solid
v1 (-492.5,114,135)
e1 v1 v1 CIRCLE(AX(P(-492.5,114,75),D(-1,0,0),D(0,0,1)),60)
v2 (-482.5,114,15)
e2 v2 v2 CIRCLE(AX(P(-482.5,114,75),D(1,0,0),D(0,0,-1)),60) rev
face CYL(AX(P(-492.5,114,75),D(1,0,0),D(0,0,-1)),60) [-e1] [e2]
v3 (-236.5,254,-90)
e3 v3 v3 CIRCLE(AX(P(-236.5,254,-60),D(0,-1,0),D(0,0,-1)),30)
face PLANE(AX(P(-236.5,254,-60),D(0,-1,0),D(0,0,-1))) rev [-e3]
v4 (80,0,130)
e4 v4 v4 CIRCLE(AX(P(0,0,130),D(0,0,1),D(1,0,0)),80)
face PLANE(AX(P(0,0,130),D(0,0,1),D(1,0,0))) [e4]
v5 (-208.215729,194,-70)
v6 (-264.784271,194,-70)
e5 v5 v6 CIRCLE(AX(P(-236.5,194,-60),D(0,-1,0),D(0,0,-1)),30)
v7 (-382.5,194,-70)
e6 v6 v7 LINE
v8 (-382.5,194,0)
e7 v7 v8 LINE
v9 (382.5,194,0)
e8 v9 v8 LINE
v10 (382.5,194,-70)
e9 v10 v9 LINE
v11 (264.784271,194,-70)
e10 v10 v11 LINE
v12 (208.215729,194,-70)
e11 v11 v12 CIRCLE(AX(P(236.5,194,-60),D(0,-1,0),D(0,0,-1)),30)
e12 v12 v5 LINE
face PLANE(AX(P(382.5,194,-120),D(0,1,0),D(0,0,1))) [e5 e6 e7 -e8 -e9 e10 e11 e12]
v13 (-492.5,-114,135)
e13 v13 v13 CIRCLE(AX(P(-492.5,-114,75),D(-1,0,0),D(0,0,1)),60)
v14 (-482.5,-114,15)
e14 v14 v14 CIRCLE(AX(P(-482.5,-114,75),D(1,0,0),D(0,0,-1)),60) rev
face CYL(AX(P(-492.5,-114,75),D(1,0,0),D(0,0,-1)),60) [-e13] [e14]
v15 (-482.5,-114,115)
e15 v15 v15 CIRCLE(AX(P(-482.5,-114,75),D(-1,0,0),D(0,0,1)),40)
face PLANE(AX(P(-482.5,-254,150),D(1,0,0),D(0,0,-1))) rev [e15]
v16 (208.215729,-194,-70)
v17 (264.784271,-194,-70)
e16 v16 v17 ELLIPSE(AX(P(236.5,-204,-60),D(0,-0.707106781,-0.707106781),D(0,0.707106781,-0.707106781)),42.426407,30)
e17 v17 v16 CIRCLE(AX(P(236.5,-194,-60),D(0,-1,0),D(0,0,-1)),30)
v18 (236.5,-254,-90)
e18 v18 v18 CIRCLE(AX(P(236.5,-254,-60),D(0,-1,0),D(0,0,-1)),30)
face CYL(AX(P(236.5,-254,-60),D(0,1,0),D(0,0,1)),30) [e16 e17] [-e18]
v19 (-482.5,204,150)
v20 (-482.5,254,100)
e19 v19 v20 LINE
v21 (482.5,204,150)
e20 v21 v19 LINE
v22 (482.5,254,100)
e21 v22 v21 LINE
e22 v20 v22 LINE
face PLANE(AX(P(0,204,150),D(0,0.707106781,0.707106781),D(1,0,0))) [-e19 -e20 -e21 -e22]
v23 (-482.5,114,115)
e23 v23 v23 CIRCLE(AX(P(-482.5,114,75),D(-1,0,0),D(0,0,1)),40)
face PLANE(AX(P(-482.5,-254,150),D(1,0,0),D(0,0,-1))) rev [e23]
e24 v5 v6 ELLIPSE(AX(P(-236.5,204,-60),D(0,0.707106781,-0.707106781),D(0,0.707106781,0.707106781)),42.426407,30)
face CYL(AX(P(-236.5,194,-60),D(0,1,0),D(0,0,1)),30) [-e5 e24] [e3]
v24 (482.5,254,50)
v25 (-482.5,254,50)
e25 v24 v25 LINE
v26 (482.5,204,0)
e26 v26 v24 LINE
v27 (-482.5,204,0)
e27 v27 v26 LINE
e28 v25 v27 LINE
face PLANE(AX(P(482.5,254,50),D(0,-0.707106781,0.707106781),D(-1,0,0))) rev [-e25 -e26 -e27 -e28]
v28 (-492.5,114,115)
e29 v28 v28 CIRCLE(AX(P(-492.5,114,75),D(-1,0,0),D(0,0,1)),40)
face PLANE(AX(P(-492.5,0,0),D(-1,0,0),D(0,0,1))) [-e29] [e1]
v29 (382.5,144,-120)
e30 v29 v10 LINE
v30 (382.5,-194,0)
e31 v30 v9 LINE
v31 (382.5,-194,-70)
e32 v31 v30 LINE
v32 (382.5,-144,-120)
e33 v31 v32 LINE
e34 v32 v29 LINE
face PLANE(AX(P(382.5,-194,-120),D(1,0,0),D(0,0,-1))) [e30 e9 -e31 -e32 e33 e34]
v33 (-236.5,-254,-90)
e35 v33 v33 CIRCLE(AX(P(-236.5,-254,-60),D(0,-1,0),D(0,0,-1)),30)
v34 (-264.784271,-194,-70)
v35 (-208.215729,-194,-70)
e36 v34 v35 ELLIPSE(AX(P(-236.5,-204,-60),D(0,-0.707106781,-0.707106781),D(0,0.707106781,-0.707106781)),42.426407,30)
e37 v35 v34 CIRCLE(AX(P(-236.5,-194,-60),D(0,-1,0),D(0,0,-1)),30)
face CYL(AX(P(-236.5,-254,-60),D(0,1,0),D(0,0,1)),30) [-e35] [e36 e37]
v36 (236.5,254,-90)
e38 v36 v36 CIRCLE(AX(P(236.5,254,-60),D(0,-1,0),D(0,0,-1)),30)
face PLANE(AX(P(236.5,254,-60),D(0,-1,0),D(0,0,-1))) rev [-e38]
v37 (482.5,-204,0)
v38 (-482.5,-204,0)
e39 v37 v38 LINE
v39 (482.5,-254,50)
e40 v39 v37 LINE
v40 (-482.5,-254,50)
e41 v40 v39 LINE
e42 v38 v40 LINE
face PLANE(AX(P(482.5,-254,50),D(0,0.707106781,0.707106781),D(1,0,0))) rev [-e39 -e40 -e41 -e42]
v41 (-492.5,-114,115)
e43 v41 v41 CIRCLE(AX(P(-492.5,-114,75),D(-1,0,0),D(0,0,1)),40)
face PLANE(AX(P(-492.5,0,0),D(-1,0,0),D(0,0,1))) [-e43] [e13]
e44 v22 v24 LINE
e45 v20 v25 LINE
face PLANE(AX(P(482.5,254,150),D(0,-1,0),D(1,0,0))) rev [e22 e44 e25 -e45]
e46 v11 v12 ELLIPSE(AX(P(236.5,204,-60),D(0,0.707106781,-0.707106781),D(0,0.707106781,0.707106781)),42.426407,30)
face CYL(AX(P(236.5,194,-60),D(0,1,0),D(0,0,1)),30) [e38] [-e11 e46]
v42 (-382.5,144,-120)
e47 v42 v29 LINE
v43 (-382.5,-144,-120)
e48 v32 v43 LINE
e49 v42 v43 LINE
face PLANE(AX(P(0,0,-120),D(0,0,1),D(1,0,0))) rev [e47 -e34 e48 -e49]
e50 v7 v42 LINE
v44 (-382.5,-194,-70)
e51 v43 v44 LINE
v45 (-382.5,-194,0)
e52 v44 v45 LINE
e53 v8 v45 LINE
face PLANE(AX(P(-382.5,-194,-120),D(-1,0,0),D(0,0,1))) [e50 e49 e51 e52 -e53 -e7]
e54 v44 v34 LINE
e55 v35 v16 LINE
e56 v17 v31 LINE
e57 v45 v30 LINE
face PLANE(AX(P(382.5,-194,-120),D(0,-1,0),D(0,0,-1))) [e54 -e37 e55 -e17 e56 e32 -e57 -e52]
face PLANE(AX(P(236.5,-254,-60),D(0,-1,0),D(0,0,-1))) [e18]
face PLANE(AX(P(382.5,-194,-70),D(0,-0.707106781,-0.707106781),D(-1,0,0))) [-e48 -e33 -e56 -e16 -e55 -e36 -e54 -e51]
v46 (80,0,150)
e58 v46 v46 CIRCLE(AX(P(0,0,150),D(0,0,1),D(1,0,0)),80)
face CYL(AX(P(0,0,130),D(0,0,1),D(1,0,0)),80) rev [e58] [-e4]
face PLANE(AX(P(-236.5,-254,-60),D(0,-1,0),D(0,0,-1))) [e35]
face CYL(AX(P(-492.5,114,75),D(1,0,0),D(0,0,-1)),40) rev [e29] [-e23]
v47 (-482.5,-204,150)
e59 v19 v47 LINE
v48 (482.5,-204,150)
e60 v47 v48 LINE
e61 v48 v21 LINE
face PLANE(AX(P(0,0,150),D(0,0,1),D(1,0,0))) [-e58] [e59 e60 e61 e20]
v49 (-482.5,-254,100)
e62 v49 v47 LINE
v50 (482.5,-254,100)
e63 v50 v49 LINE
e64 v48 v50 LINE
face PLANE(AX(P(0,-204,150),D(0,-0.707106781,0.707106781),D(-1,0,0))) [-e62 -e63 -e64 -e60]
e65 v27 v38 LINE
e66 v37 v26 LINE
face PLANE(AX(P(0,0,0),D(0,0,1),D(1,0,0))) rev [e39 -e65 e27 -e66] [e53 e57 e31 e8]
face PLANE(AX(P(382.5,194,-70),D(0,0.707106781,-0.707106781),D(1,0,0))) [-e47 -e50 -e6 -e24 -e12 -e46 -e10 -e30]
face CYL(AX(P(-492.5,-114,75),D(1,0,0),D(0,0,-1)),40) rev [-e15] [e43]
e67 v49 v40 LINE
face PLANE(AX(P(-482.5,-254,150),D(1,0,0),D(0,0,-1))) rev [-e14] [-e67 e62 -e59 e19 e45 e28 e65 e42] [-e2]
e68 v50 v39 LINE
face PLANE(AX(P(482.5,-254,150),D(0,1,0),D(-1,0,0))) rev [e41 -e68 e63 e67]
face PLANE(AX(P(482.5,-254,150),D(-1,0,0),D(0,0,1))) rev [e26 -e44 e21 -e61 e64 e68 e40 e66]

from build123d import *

# Parameters (mm, degrees)
SKETCH1_W            = 965
SKETCH1_H            = 508
BOSS_EXTRUDE1_DEPTH  = 150
SKETCH2_W            = 765
SKETCH2_H            = 388
BOSS_EXTRUDE2_DEPTH  = 120
SKETCH3_R            = 30
BOSS_EXTRUDE3_DEPTH  = 60
LPATTERN2_COUNT      = 2
LPATTERN2_PITCH      = 448
LPATTERN2_COUNT_DIR2 = 2
LPATTERN2_PITCH_DIR2 = 473
CHAMFER1_SIZE        = 50
SKETCH4_R            = 60
SKETCH4_R_2          = 40
BOSS_EXTRUDE4_DEPTH  = 10
SKETCH5_R            = 80
CUT_EXTRUDE1_DEPTH   = 20


with BuildPart() as part:
    # Sketch1 → Boss-Extrude1 (new body)
    with BuildSketch(Plane.XY):
        Rectangle(SKETCH1_W, SKETCH1_H)
    extrude(amount=BOSS_EXTRUDE1_DEPTH)


with BuildPart() as body_2:
    # Sketch2 → Boss-Extrude2 (new body)
    with BuildSketch(Plane.XY):
        Rectangle(SKETCH2_W, SKETCH2_H)
    extrude(amount=-BOSS_EXTRUDE2_DEPTH)


with BuildPart() as body_3:
    # Sketch3 → Boss-Extrude3 (new body)
    with BuildSketch(Plane.XZ.offset(194)):
        with Locations(Location((236.5, -60, 0), (0, 0, 270))):
            Circle(SKETCH3_R)
    boss_extrude3 = extrude(amount=BOSS_EXTRUDE3_DEPTH)


with BuildPart() as lpattern2_1:
    # LPattern2: pattern copy
    add(boss_extrude3.moved(Location(Vector(0, 1, 0) * (0 * LPATTERN2_PITCH) + Vector(-1, 0, 0) * (1 * LPATTERN2_PITCH_DIR2))))


with BuildPart() as lpattern2_2:
    # LPattern2: pattern copy
    add(boss_extrude3.moved(Location(Vector(0, 1, 0) * (1 * LPATTERN2_PITCH) + Vector(-1, 0, 0) * (0 * LPATTERN2_PITCH_DIR2))))


with BuildPart() as lpattern2_3:
    # LPattern2: pattern copy
    add(boss_extrude3.moved(Location(Vector(0, 1, 0) * (1 * LPATTERN2_PITCH) + Vector(-1, 0, 0) * (1 * LPATTERN2_PITCH_DIR2))))


with BuildPart() as part_1:
    add(part.part)

    # Combine1: union body 2
    add(body_2.part)

    # Combine4: union body 3, LPattern2_1
    add(body_3.part)
    add(lpattern2_1.part)


with BuildPart() as lpattern2_2_1:
    add(lpattern2_2.part)

    # Combine5: union LPattern2_3, part
    add(lpattern2_3.part)
    add(part_1.part)

    # Chamfer1
    # the kernel refuses this chamfer: 50 mm, written as the material it takes off along each edge
    with BuildSketch(Plane(origin=(611.084149398, -254, 0), x_dir=(0, -0.027495876610586594, 0.9996219169112966), z_dir=(-1, 0, 0)), Plane(origin=(-611.084149398, 254, 150), x_dir=(0, -0.9996219169112966, 0.027495876610586587), z_dir=(1, 0, 0))) as chamfer1_piece_1:
        Polygon((CHAMFER1_SIZE * 0.999621916911, CHAMFER1_SIZE * 0.0274958766106), (-CHAMFER1_SIZE * 0.0274958766106, CHAMFER1_SIZE * 0.999621916911), (0, 0), align=None)
    extrude(amount=1222.168298797, mode=Mode.SUBTRACT)
    with BuildSketch(Plane(origin=(-611.084149398, 254, 0), x_dir=(0, -0.9996219169112966, -0.02749587661058636), z_dir=(1, 0, 0)), Plane(origin=(611.084149398, -254, 150), x_dir=(0, -0.027495876610586594, -0.9996219169112966), z_dir=(-1, 0, 0))) as chamfer1_piece_2:
        Polygon((CHAMFER1_SIZE * 0.999621916911, -CHAMFER1_SIZE * 0.0274958766106), (-CHAMFER1_SIZE * 0.0274958766106, -CHAMFER1_SIZE * 0.999621916911), (0, 0), align=None)
    extrude(amount=1222.168298797, mode=Mode.SUBTRACT)
    with BuildSketch(Plane(origin=(-511.084149398, 194, -120), x_dir=(0, 0.027495876610586594, 0.9996219169112966), z_dir=(1, 0, 0))) as chamfer1_piece_3_section:
        Polygon((CHAMFER1_SIZE * 0.999621916911, CHAMFER1_SIZE * 0.0274958766106), (-CHAMFER1_SIZE * 0.0274958766106, CHAMFER1_SIZE * 0.999621916911), (0, 0), align=None)
    chamfer1_piece_3 = extrude(amount=1022.168298797, mode=Mode.PRIVATE)
    chamfer1_piece_3 = chamfer1_piece_3 - Plane(origin=(-236.5, 177.365883925, -60), x_dir=(0, 0, -1), z_dir=(0, 1, 0)) * Cylinder(30, 2245, mode=Mode.PRIVATE)
    chamfer1_piece_3 = chamfer1_piece_3 - Plane(origin=(236.5, 177.365883925, -60), x_dir=(0, 0, -1), z_dir=(0, 1, 0)) * Cylinder(30, 2245, mode=Mode.PRIVATE)
    add(chamfer1_piece_3, mode=Mode.SUBTRACT)
    with BuildSketch(Plane(origin=(511.084149398, -194, -120), x_dir=(0, -0.027495876610586594, 0.9996219169112966), z_dir=(-1, 0, 0))) as chamfer1_piece_4_section:
        Polygon((CHAMFER1_SIZE * 0.999621916911, CHAMFER1_SIZE * 0.0274958766106), (-CHAMFER1_SIZE * 0.0274958766106, CHAMFER1_SIZE * 0.999621916911), (0, 0), align=None)
    chamfer1_piece_4 = extrude(amount=1022.168298797, mode=Mode.PRIVATE)
    chamfer1_piece_4 = chamfer1_piece_4 - Plane(origin=(236.5, -177.365883925, -60), x_dir=(0, 0, -1), z_dir=(0, 1, 0)) * Cylinder(30, 2245, mode=Mode.PRIVATE)
    chamfer1_piece_4 = chamfer1_piece_4 - Plane(origin=(-236.5, -177.365883925, -60), x_dir=(0, 0, -1), z_dir=(0, 1, 0)) * Cylinder(30, 2245, mode=Mode.PRIVATE)
    add(chamfer1_piece_4, mode=Mode.SUBTRACT)

    # Sketch4 → Boss-Extrude4 (add)
    # profile 1 of 2: a face of its own
    with BuildSketch(Plane.ZY.offset(482.5)):
        with Locations(Location((75, 114, 0), (0, 0, 180))):
            Circle(SKETCH4_R)
        with Locations((75, 114)):
            Circle(SKETCH4_R_2, mode=Mode.SUBTRACT)
    # profile 2 of 2: a face of its own
    with BuildSketch(Plane.ZY.offset(482.5)):
        with Locations(Location((75, -114, 0), (0, 0, 180))):
            Circle(SKETCH4_R)
        with Locations((75, -114)):
            Circle(SKETCH4_R_2, mode=Mode.SUBTRACT)
    extrude(amount=BOSS_EXTRUDE4_DEPTH)

    # Sketch5 → Cut-Extrude1 (cut)
    with BuildSketch(Plane.XY.offset(150)):
        Circle(SKETCH5_R)
    extrude(amount=-CUT_EXTRUDE1_DEPTH, mode=Mode.SUBTRACT)


solid = lpattern2_2_1.part
